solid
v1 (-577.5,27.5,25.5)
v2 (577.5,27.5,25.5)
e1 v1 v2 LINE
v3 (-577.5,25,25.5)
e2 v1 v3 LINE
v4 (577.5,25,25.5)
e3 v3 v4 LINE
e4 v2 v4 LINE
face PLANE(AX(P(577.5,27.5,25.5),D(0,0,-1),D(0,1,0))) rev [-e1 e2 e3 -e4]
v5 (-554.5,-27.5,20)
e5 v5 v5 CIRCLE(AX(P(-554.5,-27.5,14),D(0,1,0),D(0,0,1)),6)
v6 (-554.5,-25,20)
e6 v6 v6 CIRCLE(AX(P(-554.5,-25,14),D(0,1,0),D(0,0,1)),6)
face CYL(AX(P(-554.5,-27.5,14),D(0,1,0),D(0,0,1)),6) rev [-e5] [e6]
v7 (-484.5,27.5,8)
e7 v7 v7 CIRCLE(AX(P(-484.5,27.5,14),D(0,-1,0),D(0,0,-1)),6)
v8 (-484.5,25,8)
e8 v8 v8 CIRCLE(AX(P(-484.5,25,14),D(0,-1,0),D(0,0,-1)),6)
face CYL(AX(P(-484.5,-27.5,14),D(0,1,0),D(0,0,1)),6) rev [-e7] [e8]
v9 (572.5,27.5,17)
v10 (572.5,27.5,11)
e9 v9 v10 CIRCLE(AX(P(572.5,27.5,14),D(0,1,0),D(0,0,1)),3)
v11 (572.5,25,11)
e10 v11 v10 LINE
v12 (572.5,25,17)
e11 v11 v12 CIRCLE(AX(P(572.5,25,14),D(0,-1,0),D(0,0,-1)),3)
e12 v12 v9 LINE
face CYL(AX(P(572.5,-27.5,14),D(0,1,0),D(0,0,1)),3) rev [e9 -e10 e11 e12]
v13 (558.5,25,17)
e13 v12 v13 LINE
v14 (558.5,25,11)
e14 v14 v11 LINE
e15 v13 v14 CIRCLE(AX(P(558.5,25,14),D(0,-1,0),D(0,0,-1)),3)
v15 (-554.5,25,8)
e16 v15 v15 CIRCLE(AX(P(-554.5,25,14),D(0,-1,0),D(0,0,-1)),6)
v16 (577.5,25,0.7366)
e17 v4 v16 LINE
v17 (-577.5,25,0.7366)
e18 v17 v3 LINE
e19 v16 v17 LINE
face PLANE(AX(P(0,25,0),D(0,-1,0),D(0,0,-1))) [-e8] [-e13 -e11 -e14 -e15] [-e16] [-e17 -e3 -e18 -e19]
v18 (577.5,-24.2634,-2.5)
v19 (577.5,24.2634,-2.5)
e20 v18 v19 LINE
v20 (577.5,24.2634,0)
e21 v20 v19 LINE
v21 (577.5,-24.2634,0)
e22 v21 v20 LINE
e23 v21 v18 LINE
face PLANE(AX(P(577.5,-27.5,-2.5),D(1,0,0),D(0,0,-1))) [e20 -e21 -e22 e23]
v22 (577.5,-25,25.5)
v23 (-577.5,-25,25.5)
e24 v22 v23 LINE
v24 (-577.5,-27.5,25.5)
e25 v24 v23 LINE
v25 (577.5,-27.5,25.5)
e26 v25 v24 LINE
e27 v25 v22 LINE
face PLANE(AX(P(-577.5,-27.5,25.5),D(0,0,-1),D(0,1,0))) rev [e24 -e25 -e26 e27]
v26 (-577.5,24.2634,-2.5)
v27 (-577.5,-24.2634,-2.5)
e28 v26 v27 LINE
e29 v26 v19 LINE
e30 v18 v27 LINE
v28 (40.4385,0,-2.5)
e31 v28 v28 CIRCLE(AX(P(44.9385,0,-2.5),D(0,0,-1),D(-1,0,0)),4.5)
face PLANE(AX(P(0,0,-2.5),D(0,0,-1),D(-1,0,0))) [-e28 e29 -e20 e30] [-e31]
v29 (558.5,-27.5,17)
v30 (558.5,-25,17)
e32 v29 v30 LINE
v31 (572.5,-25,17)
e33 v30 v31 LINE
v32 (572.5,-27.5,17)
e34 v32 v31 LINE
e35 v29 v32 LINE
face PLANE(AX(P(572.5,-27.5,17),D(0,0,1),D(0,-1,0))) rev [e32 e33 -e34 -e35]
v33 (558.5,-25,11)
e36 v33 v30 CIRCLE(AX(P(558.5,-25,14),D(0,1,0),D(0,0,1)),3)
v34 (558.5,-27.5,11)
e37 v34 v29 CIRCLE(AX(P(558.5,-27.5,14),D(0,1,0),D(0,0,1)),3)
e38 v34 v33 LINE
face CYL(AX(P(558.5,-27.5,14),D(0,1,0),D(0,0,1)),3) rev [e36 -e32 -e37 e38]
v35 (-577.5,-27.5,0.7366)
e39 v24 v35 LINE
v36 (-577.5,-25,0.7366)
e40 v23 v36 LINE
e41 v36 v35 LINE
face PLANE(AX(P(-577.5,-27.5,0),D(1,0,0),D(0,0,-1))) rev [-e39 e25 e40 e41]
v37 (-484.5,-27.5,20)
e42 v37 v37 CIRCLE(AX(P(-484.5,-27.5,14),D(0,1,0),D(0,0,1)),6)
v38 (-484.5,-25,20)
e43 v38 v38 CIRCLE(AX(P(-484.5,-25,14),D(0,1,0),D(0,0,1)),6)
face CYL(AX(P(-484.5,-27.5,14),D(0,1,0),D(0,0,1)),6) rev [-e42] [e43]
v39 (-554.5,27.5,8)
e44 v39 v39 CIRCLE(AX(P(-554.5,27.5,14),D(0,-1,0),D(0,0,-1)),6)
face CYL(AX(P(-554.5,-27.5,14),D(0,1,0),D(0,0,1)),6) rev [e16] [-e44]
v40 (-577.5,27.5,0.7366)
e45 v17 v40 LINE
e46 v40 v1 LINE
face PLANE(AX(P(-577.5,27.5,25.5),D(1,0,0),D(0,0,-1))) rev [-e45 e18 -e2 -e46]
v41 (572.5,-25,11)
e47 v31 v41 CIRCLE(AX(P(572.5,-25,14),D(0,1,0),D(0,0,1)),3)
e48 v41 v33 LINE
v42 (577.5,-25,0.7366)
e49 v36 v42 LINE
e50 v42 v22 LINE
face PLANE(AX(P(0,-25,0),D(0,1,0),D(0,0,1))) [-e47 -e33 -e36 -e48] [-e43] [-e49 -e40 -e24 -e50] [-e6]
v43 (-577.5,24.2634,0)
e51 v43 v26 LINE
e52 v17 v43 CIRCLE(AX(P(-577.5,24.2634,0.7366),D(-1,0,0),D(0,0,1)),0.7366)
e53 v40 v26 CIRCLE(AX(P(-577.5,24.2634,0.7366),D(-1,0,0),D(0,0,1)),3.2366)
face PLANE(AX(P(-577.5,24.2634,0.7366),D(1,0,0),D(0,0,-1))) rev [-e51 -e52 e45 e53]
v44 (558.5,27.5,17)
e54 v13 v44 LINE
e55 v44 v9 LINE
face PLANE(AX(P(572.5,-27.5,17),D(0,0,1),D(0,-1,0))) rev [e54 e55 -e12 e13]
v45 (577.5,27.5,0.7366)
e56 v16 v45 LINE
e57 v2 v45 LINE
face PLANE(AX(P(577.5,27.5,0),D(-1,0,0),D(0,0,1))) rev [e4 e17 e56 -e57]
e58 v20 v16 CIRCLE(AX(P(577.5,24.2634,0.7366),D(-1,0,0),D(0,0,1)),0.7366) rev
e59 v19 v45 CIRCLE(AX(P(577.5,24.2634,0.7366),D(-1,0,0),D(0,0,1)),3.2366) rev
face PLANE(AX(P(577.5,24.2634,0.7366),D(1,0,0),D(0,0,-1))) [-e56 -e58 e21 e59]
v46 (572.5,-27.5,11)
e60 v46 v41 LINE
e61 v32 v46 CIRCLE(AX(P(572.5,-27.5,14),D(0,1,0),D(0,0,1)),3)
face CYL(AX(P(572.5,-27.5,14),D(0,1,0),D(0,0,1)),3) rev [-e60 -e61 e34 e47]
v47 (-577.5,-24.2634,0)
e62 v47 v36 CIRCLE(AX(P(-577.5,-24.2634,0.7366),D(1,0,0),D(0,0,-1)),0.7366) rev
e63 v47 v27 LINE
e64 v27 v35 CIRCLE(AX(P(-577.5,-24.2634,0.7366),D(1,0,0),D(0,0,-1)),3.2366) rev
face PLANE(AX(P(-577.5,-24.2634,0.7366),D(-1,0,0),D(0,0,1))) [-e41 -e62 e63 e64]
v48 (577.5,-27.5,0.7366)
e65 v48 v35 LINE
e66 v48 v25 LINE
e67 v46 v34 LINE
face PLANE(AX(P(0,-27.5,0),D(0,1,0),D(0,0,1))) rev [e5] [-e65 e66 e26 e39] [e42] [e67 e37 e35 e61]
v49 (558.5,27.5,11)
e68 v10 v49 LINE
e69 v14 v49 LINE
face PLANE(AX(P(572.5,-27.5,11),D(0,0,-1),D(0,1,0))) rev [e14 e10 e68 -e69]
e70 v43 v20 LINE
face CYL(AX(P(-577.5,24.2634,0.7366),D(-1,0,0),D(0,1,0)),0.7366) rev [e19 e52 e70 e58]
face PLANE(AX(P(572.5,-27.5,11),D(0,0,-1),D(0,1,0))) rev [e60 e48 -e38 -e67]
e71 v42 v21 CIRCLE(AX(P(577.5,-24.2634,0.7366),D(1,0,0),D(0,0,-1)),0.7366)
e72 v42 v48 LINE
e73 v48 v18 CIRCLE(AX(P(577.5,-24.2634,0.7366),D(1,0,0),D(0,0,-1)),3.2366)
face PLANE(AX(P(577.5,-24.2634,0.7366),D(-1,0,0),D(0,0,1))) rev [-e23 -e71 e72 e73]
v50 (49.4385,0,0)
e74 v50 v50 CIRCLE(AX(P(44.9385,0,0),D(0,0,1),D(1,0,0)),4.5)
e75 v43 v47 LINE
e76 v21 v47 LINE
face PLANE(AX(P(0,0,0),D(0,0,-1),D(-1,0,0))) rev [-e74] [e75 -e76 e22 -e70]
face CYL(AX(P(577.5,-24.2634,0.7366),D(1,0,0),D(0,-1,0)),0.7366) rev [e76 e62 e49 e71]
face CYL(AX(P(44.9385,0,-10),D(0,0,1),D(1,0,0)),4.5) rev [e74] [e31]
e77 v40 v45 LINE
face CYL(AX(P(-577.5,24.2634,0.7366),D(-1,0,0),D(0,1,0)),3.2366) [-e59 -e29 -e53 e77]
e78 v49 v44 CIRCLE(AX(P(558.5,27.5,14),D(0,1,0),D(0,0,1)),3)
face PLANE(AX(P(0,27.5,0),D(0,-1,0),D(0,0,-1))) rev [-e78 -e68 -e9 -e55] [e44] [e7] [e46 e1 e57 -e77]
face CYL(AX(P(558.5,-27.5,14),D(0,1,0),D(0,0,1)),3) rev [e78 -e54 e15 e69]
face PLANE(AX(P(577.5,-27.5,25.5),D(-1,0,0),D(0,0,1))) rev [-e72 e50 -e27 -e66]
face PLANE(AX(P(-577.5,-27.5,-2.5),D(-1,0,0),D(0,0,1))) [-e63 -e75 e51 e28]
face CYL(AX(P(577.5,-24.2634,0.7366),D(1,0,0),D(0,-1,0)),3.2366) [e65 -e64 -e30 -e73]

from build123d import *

# Parameters (mm, degrees)
SKETCH1_W                      = 1155
SKETCH1_H                      = 55
BASE_FLANGE1_DEPTH             = 2.5
EDGE_FLANGE1_STRIP_W           = 11.4732
EDGE_FLANGE1_STRIP_H           = 2.5
EDGE_FLANGE1_STRIP_CUT_DEPTH   = 1155
EDGE_FLANGE1_STRIP_2_W         = 11.4732
EDGE_FLANGE1_STRIP_2_H         = 2.5
EDGE_FLANGE1_STRIP_CUT_2_DEPTH = 1155
EDGE_FLANGE1_DEPTH             = 1155
EDGE_FLANGE1_BEND_DEPTH        = 1155
CUT_EXTRUDE1_DEPTH             = 581.673316074
CUT_EXTRUDE1_DEPTH_BACK        = 581.673316074
SKETCH13_R                     = 6
CUT_EXTRUDE2_DEPTH             = 581.673316074
LPATTERN1_COUNT                = 2
LPATTERN1_PITCH                = 70
SKETCH14_R                     = 4.5
CUT_EXTRUDE3_DEPTH             = 10


# Sheet-metal steps are written as plain solids
with BuildPart() as part:
    # Sketch1 → Base-Flange1 (new body)
    with BuildSketch(Plane.XY):
        Rectangle(SKETCH1_W, SKETCH1_H)
    extrude(amount=-BASE_FLANGE1_DEPTH)

    # Edge-Flange1 strip (across the edge) → Edge-Flange1 strip cut (cut)
    with BuildSketch(Plane(origin=(577.5, 27.5, 0), x_dir=(0, -1, 0), z_dir=(-1, 0, 0))):
        with Locations((-2.5, -1.25)):
            Rectangle(EDGE_FLANGE1_STRIP_W, EDGE_FLANGE1_STRIP_H)
    extrude(amount=EDGE_FLANGE1_STRIP_CUT_DEPTH, mode=Mode.SUBTRACT)

    # Edge-Flange1 strip 2 (across the edge) → Edge-Flange1 strip cut 2 (cut)
    with BuildSketch(Plane(origin=(-577.5, -27.5, 0), x_dir=(0, 1, 0), z_dir=(1, 0, 0))):
        with Locations((-2.5, -1.25)):
            Rectangle(EDGE_FLANGE1_STRIP_2_W, EDGE_FLANGE1_STRIP_2_H)
    extrude(amount=EDGE_FLANGE1_STRIP_CUT_2_DEPTH, mode=Mode.SUBTRACT)

    # Edge-Flange1 section (across the edge) → Edge-Flange1 (add)
    with BuildSketch(Plane(origin=(577.5, 27.5, 0), x_dir=(0, -1, 0), z_dir=(-1, 0, 0))):
        with BuildLine():
            Line((0, 0.7366), (0, 25.5))
            Line((0, 25.5), (2.5, 25.5))
            Line((2.5, 25.5), (2.5, 0.7366))
            ThreePointArc((2.5, 0.7366), (2.715745145, 0.215745145), (3.2366, 0))
            Line((3.2366, 0), (3.2366, -2.5))
            ThreePointArc((3.2366, -2.5), (0.947978192, -1.552021808), (0, 0.7366))
        make_face()
    extrude(amount=EDGE_FLANGE1_DEPTH)

    # Edge-Flange1 section 2 (across the edge) → Edge-Flange1 bend (add)
    with BuildSketch(Plane(origin=(-577.5, -27.5, 0), x_dir=(0, 1, 0), z_dir=(1, 0, 0))):
        with BuildLine():
            Line((0, 0.7366), (0, 25.5))
            Line((0, 25.5), (2.5, 25.5))
            Line((2.5, 25.5), (2.5, 0.7366))
            ThreePointArc((2.5, 0.7366), (2.715745145, 0.215745145), (3.2366, 0))
            Line((3.2366, 0), (3.2366, -2.5))
            ThreePointArc((3.2366, -2.5), (0.947978192, -1.552021808), (0, 0.7366))
        make_face()
    extrude(amount=EDGE_FLANGE1_BEND_DEPTH)

    # Sketch12 → Cut-Extrude1 (cut, two sides: drawn at the far end of the back side and taken through both)
    with BuildSketch(Plane(origin=(0, 27.5, 0), x_dir=(1, 0, 0), z_dir=(0, 1, 0)).offset(-CUT_EXTRUDE1_DEPTH_BACK)):
        with BuildLine():
            Line((572.5, -17), (558.5, -17))
            ThreePointArc((558.5, -17), (555.5, -14), (558.5, -11))
            Line((558.5, -11), (572.5, -11))
            ThreePointArc((572.5, -11), (575.5, -14), (572.5, -17))
        make_face()
    extrude(amount=CUT_EXTRUDE1_DEPTH + CUT_EXTRUDE1_DEPTH_BACK, mode=Mode.SUBTRACT)

    # Sketch13 → Cut-Extrude2 (cut, symmetric)
    with BuildSketch(Plane(origin=(0, 27.5, 0), x_dir=(1, 0, 0), z_dir=(0, 1, 0))):
        with Locations(Location((-554.5, -14, 0), (0, 0, 270))):
            Circle(SKETCH13_R)
    cut_extrude2 = extrude(amount=CUT_EXTRUDE2_DEPTH, both=True, mode=Mode.SUBTRACT)

    # LPattern1: Cut-Extrude2 ×2
    with Locations(*[(i * LPATTERN1_PITCH, 0, 0) for i in range(1, LPATTERN1_COUNT)]):
        add(cut_extrude2, mode=Mode.SUBTRACT)

    # Sketch14 → Cut-Extrude3 (cut)
    with BuildSketch(Plane.XY):
        with Locations((44.9385, 0)):
            Circle(SKETCH14_R)
    extrude(amount=-CUT_EXTRUDE3_DEPTH, mode=Mode.SUBTRACT)


solid = part.part
